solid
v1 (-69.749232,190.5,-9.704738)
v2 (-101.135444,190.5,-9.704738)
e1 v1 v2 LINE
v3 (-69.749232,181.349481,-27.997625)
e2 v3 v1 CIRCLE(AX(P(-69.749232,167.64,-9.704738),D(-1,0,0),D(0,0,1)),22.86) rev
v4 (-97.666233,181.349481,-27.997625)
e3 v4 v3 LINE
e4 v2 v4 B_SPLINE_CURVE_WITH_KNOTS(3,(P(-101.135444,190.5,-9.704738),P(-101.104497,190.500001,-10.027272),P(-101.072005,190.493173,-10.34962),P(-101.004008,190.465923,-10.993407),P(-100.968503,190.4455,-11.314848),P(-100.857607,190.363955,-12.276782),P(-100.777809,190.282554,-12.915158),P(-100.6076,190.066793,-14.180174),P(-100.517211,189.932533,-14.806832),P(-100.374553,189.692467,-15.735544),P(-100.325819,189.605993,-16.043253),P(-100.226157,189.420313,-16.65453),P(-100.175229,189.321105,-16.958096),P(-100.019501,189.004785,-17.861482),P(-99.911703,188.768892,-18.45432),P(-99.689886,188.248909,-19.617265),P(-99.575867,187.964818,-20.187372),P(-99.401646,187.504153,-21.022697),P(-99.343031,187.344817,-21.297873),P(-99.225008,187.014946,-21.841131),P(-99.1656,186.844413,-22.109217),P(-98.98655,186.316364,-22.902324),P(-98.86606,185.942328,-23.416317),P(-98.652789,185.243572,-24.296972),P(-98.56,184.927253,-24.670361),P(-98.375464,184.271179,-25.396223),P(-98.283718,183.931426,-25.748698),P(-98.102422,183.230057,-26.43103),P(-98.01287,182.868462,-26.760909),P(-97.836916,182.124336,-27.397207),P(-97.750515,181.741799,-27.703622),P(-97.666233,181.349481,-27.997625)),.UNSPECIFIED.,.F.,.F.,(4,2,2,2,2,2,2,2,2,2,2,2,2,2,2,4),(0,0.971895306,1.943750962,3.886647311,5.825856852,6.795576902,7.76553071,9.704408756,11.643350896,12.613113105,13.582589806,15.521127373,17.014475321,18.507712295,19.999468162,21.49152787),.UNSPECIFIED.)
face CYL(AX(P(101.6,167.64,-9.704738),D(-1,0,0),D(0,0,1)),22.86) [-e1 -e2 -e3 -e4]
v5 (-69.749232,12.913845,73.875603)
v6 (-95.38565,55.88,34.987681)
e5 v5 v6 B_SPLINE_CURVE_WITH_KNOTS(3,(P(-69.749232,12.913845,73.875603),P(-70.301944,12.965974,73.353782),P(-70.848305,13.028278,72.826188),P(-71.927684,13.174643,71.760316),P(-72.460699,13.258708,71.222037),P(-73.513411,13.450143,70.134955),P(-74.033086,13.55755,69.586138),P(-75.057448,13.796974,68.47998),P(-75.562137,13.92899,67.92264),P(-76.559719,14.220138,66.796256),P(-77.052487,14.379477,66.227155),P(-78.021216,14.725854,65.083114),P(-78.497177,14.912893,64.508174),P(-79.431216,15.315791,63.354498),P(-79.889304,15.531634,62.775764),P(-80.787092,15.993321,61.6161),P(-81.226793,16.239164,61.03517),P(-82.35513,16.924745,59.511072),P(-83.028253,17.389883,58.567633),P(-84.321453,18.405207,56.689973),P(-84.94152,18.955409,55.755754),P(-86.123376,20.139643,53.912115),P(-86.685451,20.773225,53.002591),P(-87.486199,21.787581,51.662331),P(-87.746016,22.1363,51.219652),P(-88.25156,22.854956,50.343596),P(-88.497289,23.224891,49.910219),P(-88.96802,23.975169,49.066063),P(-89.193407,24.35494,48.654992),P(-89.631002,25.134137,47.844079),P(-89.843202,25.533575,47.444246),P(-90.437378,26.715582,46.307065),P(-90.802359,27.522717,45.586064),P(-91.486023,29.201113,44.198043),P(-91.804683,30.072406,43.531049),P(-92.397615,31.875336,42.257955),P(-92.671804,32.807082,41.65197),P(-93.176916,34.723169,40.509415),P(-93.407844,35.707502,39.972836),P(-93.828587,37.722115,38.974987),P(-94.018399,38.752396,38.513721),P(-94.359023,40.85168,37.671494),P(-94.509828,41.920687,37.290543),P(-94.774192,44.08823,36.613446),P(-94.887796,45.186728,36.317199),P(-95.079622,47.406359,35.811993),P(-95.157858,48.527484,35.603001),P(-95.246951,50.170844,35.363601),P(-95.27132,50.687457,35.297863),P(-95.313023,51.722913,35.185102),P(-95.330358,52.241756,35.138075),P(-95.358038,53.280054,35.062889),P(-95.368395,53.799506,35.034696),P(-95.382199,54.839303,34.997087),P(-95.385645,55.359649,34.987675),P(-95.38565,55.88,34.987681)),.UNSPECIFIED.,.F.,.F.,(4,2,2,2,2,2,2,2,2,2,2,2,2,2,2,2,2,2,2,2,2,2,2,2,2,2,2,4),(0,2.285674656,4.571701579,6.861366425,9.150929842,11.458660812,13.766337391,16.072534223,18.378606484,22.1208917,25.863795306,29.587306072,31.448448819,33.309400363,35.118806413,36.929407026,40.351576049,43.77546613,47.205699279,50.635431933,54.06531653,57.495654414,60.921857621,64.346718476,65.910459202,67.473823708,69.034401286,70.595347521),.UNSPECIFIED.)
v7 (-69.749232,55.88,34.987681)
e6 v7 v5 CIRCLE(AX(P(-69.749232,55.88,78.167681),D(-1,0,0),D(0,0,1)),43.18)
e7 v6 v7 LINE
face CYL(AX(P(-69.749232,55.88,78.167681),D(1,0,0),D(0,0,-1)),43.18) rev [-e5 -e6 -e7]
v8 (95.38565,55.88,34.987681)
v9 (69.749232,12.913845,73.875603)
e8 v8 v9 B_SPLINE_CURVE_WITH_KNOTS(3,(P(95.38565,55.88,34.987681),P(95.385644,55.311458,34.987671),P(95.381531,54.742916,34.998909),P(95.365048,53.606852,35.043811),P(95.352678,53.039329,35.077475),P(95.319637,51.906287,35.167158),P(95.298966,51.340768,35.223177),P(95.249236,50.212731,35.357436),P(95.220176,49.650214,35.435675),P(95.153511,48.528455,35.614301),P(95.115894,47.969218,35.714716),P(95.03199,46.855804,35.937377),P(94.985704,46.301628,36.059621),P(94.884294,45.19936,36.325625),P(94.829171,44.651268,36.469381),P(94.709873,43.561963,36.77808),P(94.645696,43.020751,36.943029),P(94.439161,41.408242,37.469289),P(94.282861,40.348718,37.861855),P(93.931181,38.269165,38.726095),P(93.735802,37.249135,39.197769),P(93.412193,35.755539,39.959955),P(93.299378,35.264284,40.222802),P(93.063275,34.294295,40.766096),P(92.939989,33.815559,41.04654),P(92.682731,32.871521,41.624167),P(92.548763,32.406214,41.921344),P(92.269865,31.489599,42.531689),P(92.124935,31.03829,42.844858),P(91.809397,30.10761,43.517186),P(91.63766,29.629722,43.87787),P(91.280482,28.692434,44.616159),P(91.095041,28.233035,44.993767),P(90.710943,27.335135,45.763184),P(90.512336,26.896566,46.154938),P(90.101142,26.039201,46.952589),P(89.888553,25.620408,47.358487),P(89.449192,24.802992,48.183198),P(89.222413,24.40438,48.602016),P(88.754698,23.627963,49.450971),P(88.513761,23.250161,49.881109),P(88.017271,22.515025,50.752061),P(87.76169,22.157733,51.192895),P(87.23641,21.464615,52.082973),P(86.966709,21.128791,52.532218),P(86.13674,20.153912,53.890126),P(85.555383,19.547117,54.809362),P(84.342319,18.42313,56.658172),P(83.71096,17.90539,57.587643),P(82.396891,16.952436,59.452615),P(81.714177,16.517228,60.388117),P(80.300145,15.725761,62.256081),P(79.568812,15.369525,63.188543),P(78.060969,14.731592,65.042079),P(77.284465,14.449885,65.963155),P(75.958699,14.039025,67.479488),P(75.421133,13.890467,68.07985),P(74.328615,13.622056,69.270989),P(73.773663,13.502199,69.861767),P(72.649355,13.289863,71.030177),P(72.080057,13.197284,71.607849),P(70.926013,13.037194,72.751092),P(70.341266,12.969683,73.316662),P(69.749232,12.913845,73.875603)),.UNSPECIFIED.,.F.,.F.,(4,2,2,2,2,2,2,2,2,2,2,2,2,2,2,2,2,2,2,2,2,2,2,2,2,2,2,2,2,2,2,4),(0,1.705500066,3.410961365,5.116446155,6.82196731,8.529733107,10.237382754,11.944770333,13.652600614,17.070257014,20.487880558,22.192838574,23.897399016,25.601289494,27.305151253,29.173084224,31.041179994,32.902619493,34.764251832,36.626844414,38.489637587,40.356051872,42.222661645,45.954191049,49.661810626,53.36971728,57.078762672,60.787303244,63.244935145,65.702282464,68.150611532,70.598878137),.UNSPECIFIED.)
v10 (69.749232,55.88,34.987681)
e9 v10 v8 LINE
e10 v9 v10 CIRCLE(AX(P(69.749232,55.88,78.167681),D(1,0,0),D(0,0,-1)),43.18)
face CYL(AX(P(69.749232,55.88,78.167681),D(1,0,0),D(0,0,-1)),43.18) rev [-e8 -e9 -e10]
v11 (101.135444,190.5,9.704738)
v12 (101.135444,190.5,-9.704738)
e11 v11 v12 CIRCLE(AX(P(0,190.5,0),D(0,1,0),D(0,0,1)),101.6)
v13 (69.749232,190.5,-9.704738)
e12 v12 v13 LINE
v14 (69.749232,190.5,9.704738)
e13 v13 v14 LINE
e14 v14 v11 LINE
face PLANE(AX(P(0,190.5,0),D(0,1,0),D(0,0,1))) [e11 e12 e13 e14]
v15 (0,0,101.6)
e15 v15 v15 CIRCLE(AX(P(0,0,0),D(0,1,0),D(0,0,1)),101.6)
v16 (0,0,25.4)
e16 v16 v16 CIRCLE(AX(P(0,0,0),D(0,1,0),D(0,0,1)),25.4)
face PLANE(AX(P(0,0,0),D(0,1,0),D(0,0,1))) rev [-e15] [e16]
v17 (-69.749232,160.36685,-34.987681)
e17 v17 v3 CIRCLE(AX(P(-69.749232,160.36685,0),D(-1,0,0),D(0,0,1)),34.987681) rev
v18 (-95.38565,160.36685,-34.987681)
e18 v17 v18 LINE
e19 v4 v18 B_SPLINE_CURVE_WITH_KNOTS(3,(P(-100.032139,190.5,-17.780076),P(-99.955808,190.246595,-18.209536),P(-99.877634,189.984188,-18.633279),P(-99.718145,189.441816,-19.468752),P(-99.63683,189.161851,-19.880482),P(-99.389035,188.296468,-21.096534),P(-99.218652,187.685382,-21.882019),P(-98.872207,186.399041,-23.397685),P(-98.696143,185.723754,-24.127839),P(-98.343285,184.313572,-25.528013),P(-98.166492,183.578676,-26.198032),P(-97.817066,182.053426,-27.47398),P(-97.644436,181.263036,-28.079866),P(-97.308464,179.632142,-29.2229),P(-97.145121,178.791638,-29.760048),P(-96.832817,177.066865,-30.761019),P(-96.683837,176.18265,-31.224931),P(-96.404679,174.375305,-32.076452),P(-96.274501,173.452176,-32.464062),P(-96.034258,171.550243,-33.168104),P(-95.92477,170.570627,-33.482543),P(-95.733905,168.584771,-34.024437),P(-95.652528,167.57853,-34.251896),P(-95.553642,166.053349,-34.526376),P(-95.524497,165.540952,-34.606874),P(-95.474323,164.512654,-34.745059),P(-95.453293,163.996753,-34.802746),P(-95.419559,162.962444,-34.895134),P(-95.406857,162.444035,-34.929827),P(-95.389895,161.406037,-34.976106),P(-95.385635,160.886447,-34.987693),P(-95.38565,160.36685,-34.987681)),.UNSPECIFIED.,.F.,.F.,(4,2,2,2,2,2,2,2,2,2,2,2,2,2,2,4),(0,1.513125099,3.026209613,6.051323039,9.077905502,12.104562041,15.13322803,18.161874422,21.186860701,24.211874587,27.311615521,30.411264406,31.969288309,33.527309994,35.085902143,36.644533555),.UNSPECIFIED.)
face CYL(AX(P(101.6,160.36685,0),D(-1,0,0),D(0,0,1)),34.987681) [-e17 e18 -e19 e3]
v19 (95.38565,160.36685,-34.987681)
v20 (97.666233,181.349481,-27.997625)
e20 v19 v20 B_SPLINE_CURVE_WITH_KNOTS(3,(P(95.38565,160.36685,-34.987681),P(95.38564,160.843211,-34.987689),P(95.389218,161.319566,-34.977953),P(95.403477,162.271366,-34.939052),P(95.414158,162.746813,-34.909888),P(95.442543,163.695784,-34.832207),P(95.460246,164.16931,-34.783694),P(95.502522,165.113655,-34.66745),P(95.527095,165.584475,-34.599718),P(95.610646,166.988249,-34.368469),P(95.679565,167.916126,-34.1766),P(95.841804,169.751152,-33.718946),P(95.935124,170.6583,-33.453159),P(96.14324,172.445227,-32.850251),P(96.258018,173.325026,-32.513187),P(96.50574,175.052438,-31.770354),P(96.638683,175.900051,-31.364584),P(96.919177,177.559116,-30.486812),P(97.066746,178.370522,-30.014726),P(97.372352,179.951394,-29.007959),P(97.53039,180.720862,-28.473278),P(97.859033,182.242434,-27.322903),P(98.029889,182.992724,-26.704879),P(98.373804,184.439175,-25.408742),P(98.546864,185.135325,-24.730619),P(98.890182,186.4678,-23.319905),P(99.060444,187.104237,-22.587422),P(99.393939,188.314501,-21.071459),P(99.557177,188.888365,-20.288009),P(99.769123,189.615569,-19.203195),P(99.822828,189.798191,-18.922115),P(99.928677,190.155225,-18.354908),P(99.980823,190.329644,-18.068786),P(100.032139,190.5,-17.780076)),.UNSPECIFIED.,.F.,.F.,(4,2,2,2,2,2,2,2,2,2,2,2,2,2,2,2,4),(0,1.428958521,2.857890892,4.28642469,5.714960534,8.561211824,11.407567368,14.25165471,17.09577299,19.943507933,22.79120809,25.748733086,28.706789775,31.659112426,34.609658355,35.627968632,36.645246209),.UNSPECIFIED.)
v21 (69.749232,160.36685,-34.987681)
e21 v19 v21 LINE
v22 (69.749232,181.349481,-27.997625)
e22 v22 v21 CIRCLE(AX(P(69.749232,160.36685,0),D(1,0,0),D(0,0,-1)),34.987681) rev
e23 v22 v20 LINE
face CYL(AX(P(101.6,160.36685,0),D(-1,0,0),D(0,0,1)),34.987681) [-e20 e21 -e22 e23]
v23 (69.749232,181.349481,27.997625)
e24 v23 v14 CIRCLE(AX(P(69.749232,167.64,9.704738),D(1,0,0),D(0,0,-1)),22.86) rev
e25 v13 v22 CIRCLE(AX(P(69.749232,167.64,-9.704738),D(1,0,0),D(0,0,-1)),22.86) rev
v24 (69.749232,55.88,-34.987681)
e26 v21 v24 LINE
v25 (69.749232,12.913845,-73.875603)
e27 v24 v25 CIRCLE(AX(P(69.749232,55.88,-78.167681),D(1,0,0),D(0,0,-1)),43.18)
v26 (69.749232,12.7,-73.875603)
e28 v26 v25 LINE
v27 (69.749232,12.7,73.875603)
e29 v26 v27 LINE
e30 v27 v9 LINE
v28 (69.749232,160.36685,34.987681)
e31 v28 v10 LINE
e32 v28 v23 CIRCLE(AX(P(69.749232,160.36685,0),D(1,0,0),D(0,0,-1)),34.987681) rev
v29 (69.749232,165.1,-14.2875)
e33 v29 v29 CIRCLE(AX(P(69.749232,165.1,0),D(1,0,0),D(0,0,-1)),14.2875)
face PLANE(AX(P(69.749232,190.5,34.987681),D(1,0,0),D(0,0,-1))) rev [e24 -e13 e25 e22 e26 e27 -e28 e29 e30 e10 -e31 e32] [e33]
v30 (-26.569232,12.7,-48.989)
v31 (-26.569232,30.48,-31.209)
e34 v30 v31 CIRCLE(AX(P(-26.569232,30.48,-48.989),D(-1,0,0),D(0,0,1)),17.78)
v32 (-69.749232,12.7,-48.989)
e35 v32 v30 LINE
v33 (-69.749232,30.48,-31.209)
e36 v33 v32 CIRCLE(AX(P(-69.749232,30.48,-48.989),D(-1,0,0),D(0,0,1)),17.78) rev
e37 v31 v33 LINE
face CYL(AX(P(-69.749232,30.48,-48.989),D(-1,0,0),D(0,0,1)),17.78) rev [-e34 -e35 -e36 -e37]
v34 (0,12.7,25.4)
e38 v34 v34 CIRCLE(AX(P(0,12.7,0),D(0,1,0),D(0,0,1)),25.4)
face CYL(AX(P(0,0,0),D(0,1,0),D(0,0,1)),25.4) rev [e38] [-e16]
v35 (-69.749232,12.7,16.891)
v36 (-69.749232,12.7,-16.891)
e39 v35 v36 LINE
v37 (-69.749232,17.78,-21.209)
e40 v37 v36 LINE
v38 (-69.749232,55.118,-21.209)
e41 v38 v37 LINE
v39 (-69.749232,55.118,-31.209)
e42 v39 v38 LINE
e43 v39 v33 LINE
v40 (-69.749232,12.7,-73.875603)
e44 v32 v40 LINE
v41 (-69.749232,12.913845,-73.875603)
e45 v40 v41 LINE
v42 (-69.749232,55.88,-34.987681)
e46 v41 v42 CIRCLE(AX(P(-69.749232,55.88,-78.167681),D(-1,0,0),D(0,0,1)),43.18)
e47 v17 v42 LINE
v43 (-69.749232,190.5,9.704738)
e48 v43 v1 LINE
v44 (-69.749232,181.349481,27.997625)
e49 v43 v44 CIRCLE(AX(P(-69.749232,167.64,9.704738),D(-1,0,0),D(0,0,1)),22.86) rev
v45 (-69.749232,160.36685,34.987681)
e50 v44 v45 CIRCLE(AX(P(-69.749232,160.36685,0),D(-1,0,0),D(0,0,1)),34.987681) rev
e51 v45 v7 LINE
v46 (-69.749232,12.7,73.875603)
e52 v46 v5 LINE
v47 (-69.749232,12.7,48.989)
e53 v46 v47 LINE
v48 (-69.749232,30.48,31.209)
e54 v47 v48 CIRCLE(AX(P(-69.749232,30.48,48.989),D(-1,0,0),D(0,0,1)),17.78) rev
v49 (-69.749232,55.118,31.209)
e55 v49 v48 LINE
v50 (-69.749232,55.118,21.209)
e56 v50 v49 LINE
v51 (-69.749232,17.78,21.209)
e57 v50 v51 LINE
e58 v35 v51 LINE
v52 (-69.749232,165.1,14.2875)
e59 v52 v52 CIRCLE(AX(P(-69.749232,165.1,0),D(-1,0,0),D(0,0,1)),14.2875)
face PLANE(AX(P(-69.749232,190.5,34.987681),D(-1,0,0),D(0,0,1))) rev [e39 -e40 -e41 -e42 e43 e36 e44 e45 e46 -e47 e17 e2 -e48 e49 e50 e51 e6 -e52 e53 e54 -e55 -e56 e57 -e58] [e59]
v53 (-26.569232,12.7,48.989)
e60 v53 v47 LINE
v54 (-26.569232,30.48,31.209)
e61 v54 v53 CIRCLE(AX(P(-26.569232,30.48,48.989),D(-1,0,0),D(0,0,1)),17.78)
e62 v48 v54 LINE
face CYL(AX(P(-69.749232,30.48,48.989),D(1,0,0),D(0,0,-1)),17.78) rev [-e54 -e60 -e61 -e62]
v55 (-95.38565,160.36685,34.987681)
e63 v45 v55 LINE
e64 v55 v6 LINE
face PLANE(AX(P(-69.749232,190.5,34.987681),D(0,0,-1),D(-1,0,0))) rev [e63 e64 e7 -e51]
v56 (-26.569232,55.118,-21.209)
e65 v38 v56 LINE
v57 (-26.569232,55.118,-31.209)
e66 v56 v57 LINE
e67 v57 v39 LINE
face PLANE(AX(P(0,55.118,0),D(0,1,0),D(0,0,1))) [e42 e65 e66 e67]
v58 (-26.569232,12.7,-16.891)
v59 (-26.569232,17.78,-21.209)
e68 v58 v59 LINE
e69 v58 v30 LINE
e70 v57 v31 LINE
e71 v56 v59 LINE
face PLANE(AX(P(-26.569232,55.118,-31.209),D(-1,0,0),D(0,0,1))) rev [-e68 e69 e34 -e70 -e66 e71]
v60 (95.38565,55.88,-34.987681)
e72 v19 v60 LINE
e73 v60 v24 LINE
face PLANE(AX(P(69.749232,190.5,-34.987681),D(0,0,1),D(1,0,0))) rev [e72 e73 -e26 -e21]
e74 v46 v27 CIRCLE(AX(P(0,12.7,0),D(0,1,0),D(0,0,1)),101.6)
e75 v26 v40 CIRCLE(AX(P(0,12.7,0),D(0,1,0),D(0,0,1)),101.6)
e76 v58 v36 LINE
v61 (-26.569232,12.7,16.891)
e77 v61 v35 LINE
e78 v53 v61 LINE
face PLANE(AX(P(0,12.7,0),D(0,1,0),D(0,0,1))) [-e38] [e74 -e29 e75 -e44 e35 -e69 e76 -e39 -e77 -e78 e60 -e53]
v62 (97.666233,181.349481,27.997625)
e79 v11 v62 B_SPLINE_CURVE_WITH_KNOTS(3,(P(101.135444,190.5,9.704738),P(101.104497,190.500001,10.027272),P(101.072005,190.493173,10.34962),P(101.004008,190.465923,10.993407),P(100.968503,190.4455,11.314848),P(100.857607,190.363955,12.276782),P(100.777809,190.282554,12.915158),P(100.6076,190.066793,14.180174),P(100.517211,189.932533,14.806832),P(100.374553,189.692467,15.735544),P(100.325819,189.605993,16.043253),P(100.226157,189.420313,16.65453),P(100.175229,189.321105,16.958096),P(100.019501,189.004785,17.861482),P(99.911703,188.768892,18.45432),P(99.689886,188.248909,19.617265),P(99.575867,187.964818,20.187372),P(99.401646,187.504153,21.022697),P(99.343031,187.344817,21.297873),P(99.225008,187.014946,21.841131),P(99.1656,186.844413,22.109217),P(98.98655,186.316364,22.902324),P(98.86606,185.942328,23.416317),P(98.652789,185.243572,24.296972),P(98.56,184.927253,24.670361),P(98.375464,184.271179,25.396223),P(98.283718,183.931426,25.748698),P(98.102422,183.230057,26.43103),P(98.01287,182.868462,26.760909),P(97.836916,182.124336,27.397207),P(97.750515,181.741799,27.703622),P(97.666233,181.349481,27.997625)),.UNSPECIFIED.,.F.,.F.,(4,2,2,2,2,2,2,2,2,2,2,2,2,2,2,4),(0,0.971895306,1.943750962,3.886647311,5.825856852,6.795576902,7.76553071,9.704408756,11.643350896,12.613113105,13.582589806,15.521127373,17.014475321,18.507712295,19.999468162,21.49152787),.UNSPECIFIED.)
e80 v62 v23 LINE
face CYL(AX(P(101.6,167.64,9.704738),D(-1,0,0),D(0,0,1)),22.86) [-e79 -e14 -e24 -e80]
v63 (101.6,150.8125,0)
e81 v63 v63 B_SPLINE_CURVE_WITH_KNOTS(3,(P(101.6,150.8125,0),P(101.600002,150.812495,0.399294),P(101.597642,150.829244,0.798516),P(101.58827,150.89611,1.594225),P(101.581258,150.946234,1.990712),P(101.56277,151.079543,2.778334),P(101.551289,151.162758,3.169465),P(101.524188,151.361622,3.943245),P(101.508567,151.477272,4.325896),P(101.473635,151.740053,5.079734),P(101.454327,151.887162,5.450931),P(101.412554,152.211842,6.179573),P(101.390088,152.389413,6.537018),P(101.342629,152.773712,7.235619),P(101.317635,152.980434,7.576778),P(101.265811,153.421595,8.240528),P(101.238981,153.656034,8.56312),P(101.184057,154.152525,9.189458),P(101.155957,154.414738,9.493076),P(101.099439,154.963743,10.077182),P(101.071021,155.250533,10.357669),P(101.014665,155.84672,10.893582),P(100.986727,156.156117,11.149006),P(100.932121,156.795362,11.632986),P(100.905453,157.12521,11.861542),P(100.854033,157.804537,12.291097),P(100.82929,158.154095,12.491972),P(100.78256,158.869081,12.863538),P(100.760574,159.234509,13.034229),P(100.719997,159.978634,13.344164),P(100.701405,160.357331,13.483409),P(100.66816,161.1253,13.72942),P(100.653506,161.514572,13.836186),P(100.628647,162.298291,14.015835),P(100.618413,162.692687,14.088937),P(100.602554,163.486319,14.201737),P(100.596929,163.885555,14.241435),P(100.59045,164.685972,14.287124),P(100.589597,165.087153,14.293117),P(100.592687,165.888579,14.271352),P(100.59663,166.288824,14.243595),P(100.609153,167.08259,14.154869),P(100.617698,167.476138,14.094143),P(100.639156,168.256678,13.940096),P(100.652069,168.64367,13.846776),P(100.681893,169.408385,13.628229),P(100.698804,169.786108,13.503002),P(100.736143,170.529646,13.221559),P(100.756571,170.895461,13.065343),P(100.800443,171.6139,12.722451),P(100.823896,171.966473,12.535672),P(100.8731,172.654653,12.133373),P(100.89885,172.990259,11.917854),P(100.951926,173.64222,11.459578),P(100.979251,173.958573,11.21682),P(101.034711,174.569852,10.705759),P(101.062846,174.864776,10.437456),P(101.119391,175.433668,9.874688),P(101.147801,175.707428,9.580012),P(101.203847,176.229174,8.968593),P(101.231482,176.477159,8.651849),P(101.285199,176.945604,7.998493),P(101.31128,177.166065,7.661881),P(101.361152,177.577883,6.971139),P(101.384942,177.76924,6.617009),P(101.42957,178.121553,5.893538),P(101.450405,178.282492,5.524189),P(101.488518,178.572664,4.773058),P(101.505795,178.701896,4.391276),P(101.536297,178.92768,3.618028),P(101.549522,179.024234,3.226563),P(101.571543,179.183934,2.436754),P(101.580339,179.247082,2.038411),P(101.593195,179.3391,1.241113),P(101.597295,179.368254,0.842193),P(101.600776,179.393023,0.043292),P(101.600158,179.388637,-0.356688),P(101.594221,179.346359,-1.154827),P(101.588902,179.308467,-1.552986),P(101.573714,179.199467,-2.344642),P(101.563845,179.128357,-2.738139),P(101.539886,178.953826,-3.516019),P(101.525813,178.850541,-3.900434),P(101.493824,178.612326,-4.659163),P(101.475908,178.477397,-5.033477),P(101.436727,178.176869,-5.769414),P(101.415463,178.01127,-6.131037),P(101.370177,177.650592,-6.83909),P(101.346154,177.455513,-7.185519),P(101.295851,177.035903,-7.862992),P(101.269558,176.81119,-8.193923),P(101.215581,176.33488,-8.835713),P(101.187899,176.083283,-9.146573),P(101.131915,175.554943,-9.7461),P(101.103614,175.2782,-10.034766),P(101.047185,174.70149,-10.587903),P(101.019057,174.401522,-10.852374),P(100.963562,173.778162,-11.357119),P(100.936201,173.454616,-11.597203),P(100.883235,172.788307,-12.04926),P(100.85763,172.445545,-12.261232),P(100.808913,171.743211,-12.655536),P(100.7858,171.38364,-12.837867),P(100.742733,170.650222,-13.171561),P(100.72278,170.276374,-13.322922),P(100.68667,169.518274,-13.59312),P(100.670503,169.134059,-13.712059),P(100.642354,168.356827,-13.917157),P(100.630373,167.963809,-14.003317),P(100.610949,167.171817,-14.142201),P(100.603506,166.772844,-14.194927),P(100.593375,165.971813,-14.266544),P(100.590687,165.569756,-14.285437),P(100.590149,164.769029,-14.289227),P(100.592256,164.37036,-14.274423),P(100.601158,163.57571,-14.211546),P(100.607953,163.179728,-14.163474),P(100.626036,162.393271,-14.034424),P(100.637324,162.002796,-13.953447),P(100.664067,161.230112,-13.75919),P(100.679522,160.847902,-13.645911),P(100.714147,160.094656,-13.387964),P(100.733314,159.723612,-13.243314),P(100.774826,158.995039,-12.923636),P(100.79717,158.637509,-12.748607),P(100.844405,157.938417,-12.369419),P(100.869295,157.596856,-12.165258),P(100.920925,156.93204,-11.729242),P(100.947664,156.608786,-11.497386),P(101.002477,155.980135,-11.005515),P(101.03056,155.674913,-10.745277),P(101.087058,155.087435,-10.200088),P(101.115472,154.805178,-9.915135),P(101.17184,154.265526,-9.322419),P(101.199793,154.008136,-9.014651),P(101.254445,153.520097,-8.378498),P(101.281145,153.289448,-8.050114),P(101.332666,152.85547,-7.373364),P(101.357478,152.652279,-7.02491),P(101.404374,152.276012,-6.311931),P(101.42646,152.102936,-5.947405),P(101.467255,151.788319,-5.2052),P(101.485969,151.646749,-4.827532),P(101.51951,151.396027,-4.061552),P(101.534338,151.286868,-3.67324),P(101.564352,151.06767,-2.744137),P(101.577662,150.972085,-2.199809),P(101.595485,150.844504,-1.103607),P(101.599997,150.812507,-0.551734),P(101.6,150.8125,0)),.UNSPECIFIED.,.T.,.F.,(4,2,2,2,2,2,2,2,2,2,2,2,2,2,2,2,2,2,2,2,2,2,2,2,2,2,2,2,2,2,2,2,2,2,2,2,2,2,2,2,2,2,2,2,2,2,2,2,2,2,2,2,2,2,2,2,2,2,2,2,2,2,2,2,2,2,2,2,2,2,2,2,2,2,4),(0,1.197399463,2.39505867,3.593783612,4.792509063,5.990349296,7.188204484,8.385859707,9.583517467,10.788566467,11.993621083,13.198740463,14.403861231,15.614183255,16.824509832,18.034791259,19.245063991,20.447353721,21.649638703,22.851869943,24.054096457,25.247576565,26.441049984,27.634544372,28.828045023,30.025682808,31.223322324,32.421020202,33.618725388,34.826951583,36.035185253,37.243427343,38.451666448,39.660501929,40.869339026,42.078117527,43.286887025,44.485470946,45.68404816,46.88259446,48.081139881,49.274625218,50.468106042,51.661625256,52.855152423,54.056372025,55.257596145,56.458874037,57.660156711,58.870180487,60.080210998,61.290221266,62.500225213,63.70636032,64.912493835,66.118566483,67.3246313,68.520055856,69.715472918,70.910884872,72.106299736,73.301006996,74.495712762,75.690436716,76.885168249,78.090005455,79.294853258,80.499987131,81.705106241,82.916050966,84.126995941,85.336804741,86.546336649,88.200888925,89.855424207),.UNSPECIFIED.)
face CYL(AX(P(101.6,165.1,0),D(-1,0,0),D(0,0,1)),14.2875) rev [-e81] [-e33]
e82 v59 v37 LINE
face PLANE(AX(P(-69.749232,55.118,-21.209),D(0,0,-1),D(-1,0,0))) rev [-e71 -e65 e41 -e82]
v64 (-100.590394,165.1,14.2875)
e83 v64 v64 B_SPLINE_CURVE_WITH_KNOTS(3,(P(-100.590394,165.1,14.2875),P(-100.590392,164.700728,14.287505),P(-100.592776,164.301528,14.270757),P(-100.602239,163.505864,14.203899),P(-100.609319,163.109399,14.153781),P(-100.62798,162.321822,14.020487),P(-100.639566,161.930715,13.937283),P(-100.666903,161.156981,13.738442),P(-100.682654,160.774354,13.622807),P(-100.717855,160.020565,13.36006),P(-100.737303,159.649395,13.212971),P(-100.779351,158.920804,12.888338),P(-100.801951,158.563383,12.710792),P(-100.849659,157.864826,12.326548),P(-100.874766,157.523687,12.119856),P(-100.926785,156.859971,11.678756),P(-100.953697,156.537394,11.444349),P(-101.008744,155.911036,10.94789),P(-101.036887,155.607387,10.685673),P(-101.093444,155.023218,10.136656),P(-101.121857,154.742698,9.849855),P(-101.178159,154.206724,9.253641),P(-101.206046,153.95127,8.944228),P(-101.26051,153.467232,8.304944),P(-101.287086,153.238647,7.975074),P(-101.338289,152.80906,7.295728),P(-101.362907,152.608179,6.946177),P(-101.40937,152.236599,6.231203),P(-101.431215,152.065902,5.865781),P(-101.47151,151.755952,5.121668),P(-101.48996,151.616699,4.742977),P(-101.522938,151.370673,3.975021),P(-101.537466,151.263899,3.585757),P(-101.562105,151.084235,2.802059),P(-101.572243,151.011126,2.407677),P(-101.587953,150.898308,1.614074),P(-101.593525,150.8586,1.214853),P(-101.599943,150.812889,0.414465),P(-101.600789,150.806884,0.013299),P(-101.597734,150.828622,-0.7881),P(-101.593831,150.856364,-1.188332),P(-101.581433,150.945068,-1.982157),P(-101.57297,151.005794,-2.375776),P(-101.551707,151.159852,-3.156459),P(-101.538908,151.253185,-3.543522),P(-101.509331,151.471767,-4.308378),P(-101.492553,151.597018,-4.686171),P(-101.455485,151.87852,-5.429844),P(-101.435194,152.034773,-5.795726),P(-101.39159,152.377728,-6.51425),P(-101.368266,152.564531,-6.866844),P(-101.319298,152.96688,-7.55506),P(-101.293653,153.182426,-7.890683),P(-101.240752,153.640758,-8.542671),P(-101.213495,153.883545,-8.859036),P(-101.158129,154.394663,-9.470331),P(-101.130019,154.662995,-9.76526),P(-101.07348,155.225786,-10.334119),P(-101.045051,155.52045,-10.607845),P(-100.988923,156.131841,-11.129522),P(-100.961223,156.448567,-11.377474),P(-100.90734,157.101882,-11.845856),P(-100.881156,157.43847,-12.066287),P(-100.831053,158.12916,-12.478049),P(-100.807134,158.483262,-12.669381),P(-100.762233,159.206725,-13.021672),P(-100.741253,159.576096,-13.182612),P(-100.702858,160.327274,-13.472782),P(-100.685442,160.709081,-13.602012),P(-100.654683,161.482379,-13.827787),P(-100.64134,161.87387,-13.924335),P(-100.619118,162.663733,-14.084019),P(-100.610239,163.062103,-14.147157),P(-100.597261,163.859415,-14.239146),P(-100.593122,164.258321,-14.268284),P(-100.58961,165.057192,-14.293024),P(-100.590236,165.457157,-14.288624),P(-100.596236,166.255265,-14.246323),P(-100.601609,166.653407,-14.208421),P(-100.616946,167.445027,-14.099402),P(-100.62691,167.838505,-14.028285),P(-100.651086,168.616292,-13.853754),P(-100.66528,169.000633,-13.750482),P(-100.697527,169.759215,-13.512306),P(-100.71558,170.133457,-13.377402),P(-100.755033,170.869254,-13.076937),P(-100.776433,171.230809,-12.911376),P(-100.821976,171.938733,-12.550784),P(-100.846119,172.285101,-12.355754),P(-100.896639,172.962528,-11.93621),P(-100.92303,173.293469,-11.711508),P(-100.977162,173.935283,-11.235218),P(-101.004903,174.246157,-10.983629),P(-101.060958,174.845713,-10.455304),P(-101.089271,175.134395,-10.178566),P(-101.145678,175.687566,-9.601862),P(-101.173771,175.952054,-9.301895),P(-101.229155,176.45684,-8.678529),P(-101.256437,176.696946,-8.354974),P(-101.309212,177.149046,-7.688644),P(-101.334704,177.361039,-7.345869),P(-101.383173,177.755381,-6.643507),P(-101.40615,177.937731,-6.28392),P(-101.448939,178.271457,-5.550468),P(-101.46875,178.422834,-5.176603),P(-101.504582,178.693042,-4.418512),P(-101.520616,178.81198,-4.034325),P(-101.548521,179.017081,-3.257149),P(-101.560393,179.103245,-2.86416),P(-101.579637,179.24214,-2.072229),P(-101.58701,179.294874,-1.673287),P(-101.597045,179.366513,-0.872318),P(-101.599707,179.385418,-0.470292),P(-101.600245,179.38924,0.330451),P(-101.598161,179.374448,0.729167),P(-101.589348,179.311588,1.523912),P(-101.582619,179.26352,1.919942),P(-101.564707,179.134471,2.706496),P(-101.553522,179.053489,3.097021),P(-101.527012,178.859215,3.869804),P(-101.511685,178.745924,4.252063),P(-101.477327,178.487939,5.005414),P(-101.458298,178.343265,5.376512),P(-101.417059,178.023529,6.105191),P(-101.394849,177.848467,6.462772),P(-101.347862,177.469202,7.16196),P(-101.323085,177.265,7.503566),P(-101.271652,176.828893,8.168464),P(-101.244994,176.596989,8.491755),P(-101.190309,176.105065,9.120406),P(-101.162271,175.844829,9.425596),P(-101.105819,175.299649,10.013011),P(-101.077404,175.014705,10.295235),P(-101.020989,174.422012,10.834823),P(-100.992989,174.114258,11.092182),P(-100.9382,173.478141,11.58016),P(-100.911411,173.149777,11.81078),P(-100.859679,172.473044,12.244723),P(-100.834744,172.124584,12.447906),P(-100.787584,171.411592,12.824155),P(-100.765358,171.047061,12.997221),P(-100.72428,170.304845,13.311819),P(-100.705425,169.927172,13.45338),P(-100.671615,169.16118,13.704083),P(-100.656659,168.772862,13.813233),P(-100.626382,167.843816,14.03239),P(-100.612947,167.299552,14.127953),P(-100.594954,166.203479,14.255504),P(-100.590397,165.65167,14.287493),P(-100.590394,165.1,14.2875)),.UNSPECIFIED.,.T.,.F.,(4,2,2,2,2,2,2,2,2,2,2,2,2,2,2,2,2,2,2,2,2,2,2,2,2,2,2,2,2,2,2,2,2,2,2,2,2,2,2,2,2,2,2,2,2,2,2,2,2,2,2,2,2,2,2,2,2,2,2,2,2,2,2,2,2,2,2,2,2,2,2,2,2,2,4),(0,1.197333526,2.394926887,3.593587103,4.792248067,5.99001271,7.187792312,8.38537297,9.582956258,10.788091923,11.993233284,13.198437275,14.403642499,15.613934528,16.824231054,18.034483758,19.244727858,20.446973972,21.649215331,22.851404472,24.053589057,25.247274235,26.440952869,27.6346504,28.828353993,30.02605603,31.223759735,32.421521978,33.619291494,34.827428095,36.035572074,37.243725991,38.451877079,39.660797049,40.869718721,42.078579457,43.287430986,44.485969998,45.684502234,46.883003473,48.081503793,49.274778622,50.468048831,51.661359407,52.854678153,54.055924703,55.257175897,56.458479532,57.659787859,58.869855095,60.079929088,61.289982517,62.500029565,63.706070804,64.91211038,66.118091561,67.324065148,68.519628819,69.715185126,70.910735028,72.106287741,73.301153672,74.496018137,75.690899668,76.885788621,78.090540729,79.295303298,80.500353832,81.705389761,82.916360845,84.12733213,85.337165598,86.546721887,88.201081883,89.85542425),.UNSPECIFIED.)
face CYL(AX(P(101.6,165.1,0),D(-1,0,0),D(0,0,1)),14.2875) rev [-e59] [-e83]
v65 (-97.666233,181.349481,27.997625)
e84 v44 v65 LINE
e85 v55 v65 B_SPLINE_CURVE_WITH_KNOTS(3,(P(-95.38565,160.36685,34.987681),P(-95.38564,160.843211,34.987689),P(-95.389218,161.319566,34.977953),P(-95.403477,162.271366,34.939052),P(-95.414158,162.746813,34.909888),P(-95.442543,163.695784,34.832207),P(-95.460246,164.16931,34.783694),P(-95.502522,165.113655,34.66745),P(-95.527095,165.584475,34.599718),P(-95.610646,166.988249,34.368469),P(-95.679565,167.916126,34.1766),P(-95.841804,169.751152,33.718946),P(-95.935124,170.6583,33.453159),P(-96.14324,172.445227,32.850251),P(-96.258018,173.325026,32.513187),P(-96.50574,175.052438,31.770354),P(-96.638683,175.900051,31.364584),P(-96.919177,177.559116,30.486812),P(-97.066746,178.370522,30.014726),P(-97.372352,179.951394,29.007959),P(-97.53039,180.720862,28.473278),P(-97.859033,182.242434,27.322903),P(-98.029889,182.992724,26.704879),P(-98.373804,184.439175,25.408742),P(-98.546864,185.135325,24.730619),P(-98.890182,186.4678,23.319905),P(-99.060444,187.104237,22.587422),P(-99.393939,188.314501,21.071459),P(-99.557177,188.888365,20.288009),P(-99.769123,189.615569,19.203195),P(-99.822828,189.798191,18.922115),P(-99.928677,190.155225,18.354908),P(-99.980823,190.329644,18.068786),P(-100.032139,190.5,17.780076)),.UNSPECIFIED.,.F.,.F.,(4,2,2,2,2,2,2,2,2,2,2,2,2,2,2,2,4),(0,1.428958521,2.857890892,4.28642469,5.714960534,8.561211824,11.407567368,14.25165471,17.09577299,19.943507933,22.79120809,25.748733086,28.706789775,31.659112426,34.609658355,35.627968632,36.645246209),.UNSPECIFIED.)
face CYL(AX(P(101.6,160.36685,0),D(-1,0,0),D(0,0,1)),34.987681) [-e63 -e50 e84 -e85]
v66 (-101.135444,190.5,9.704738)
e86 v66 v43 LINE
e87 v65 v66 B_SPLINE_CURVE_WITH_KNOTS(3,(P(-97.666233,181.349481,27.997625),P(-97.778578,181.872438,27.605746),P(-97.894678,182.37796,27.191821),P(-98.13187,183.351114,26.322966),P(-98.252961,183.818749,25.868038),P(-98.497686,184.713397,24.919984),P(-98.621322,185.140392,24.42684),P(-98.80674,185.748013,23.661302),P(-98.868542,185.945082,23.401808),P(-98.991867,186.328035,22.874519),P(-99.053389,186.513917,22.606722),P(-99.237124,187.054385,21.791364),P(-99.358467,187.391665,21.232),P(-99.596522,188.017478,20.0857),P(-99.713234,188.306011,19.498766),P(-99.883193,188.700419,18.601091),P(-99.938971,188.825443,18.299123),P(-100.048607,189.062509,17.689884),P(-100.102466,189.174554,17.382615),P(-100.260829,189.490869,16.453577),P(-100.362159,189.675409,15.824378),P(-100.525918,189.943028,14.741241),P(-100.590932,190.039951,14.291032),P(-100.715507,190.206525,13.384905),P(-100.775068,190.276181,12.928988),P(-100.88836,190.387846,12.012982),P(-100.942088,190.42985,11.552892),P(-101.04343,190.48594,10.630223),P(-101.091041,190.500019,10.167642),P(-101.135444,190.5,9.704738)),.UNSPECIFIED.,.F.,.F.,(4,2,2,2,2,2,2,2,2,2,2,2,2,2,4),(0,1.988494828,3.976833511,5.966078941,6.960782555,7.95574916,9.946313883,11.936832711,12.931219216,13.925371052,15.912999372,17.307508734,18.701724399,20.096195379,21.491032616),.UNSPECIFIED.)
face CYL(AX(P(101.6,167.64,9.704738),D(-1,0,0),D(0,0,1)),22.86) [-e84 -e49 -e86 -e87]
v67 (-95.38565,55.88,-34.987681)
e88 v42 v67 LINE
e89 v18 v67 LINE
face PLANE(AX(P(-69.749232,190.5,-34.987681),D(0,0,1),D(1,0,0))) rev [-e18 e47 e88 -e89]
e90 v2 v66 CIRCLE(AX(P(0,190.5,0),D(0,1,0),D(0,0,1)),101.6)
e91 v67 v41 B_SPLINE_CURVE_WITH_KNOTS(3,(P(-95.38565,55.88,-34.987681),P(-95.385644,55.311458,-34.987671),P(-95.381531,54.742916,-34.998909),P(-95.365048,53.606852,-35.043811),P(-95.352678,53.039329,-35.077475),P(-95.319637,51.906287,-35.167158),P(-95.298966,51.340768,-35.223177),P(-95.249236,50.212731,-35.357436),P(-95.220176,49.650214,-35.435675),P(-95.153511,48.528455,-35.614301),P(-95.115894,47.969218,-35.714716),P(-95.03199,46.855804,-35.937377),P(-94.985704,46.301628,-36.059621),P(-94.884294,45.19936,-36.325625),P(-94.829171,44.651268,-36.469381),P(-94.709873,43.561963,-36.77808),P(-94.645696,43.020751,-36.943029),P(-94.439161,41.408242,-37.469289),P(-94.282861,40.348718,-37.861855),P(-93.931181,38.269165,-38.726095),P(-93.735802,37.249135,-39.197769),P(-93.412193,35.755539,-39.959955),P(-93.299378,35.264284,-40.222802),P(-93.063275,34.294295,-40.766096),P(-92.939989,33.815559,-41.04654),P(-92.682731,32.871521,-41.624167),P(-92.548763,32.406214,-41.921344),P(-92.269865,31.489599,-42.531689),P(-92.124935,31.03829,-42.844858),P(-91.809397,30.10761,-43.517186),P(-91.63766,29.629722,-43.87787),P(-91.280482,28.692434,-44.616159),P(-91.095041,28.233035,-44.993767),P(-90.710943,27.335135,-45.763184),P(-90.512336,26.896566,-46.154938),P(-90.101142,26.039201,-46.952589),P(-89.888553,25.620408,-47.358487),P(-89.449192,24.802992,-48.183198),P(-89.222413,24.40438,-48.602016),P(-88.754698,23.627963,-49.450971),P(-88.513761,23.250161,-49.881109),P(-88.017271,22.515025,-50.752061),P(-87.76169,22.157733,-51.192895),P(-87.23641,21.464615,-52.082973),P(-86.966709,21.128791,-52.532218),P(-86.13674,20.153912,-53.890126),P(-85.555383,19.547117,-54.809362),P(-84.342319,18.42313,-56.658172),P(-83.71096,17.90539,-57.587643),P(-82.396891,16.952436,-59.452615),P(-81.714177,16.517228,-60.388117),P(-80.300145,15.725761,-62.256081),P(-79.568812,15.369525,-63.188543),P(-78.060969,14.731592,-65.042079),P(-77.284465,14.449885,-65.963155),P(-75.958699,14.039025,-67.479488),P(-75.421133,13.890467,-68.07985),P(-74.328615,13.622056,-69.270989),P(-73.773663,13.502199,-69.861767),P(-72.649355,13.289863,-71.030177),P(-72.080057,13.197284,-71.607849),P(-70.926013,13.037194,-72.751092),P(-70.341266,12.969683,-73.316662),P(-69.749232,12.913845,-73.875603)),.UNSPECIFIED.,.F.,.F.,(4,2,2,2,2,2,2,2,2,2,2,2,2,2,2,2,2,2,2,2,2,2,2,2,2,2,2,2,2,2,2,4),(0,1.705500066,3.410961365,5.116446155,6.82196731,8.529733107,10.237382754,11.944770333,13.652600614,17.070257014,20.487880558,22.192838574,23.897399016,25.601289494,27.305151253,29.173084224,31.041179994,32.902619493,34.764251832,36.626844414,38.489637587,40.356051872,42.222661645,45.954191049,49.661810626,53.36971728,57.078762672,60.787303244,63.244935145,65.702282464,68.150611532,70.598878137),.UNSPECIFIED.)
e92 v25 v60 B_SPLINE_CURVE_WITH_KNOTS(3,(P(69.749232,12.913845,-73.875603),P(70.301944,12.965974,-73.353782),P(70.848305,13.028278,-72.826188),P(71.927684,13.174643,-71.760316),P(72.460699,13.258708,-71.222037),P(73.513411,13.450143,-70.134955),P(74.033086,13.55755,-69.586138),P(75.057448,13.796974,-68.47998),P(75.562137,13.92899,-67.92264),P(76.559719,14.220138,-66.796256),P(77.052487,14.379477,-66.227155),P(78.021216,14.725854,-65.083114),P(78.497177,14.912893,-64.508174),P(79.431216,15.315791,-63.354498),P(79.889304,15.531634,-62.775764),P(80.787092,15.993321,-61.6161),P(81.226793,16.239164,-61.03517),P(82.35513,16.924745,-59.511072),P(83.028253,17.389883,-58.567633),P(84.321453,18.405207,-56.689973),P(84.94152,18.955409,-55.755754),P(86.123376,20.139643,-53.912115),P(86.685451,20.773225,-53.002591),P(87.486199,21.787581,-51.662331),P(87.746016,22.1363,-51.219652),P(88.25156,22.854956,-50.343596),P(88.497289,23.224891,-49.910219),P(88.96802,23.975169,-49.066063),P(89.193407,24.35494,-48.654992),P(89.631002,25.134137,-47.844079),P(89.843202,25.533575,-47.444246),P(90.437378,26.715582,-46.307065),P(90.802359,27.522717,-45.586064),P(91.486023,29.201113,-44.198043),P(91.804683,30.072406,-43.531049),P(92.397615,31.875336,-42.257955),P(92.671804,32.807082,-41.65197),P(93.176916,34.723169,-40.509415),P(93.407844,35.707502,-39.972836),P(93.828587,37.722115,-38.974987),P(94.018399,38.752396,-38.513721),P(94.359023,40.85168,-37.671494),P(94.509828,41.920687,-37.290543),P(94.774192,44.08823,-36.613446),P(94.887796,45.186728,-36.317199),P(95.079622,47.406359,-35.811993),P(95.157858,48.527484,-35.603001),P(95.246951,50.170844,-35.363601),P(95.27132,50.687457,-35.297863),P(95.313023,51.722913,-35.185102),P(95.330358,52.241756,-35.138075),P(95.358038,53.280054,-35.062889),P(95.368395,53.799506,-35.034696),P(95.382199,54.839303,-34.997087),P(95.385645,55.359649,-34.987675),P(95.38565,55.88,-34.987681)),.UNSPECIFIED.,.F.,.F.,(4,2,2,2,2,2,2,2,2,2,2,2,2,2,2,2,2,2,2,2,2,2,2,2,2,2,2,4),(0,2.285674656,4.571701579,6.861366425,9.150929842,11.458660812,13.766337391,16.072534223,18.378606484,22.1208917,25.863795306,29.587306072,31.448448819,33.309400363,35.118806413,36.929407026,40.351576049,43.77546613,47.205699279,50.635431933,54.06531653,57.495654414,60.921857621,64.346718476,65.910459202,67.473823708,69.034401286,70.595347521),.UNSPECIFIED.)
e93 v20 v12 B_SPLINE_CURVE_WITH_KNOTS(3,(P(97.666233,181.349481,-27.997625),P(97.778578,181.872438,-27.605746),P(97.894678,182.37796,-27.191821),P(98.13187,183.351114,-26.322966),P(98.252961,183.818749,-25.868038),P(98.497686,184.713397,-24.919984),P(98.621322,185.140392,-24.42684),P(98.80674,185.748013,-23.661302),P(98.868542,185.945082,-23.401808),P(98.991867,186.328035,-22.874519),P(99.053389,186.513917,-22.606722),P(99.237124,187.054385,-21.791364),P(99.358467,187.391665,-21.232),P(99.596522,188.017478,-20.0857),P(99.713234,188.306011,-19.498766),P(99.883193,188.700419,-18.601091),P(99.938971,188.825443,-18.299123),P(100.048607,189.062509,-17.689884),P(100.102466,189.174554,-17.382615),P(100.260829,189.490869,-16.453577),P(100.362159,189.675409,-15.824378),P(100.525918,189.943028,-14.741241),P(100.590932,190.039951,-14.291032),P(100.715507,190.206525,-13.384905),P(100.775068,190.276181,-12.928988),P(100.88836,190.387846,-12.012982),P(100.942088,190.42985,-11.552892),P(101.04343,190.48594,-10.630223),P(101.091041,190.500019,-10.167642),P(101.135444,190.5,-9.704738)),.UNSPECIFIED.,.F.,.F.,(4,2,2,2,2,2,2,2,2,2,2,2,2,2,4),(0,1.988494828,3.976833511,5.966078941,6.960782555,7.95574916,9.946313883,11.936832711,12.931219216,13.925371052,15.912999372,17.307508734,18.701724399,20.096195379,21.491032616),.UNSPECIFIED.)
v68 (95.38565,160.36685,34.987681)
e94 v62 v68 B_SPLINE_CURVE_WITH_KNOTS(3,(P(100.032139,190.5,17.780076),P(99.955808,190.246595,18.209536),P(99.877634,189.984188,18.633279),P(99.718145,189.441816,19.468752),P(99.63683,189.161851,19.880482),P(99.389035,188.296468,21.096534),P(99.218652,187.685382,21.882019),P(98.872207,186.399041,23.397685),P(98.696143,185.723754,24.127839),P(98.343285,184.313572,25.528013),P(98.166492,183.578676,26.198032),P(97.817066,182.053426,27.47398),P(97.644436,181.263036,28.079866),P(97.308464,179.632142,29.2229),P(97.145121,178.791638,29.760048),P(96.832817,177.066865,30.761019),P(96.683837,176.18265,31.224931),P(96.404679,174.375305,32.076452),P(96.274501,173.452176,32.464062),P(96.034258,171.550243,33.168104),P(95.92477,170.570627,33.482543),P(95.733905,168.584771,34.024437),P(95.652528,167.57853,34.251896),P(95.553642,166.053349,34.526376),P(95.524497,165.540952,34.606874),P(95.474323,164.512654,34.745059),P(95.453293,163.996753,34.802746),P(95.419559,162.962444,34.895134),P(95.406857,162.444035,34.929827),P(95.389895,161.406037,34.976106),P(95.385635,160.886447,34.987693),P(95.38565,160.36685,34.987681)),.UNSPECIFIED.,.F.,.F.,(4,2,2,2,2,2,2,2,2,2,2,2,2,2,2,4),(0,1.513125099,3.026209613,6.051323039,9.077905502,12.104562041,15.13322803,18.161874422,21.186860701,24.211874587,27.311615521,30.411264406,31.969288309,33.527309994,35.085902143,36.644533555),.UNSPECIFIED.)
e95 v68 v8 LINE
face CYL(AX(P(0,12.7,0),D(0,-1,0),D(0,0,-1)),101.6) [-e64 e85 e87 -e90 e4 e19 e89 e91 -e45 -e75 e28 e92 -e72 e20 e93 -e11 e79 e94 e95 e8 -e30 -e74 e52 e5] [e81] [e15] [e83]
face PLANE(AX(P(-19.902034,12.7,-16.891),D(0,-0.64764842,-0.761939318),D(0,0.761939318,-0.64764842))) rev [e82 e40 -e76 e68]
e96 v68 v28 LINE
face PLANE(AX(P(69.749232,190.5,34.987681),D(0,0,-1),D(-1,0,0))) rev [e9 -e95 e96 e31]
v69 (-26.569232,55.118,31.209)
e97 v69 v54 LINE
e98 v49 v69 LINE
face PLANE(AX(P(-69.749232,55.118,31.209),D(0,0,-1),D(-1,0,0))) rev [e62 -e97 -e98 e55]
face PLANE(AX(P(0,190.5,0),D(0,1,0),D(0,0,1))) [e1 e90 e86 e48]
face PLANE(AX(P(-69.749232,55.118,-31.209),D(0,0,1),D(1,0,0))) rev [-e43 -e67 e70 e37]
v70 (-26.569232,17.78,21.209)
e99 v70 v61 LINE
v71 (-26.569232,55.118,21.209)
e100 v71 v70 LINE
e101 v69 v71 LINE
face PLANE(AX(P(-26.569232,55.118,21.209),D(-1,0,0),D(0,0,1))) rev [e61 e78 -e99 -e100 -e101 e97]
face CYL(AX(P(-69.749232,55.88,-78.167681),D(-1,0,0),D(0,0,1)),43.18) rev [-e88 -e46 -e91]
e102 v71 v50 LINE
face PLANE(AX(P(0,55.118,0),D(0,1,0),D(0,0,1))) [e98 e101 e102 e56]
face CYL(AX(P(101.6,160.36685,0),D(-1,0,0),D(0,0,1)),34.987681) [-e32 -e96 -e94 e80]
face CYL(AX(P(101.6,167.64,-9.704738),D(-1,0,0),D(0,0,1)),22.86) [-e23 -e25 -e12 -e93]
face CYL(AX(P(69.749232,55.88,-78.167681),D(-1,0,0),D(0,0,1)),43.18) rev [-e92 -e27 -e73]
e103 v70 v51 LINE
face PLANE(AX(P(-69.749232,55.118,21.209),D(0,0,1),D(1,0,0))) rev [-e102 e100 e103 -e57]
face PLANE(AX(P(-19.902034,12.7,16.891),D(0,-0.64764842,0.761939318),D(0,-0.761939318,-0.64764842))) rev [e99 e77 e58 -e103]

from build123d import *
from build123d.topology import SkipClean

# Parameters (mm, degrees)
SKETCH1_R               = 101.6
BOSS_EXTRUDE1_DEPTH     = 12.7
BOSS_EXTRUDE3_DEPTH     = 177.8
FILLET3_R               = 43.18
SKETCH3_R               = 25.4
CUT_EXTRUDE1_DEPTH      = 229.600000167
CUT_EXTRUDE2_DEPTH      = 276.632670899
CUT_EXTRUDE2_DEPTH_BACK = 276.632670899
SKETCH4_R               = 14.2875
CUT_EXTRUDE3_DEPTH      = 276.6326709
CUT_EXTRUDE3_DEPTH_BACK = 276.6326709
FILLET4_R               = 22.86
SKETCH7_W               = 43.18
SKETCH7_H               = 10
BOSS_EXTRUDE4_DEPTH     = 42.418
BOSS_EXTRUDE5_DEPTH     = 43.18
FILLET5_R               = 17.78


with BuildPart() as part:
    # Sketch1 → Boss-Extrude1 (new body)
    with BuildSketch(Plane(origin=(0, 0, 0), x_dir=(1, 0, 0), z_dir=(0, 1, 0))):
        with Locations(Location((0, 0, 0), (0, 0, 270))):
            Circle(SKETCH1_R)
    extrude(amount=BOSS_EXTRUDE1_DEPTH)

    # Sketch2 → Boss-Extrude3 (add)
    with SkipClean():  # the faces are left unmerged after this step: merging them gives an invalid solid
        with BuildSketch(Plane(origin=(0, 12.7, 0), x_dir=(1, 0, 0), z_dir=(0, 1, 0))):
            with BuildLine():
                Line((-69.749231612, -34.987681034), (-95.385649738, -34.987681034))
                ThreePointArc((-95.385649738, -34.987681034), (-101.6, 0), (-95.385649738, 34.987681034))
                Line((-95.385649738, 34.987681034), (-69.749231612, 34.987681034))
                Line((-69.749231612, 34.987681034), (-69.749231612, -34.987681034))
            make_face()
            with BuildLine():
                Line((69.749231612, 34.987681034), (95.385649738, 34.987681034))
                ThreePointArc((95.385649738, 34.987681034), (101.6, 0), (95.385649738, -34.987681034))
                Line((95.385649738, -34.987681034), (69.749231612, -34.987681034))
                Line((69.749231612, -34.987681034), (69.749231612, 34.987681034))
            make_face()
        extrude(amount=BOSS_EXTRUDE3_DEPTH)

    # Fillet3
    # the kernel refuses this fillet: 43.18 mm, written as the material it adds along each edge
    with BuildSketch(Plane(origin=(-203.335649738, 12.7, -34.987681034), x_dir=(0, 0, -1), z_dir=(1, 0, 0))) as fillet3_piece_1_section:
        with BuildLine():
            CenterArc((FILLET3_R, FILLET3_R), FILLET3_R, 180, 90)
            Line((0, FILLET3_R), (0, 0))
            Line((0, 0), (FILLET3_R, 0))
        make_face()
    fillet3_piece_1 = extrude(amount=133.586418126, mode=Mode.PRIVATE)
    fillet3_piece_1 = fillet3_piece_1 & Plane(origin=(0, 23.799745308, 0), x_dir=(0, 0, 1), z_dir=(0, -1, 0)) * Cylinder(101.6, 440, mode=Mode.PRIVATE)
    add(fillet3_piece_1)
    with BuildSketch(Plane(origin=(203.335649738, 12.7, 34.987681034), x_dir=(0, 0, 1), z_dir=(-1, 0, 0))) as fillet3_piece_2_section:
        with BuildLine():
            CenterArc((FILLET3_R, FILLET3_R), FILLET3_R, 180, 90)
            Line((0, FILLET3_R), (0, 0))
            Line((0, 0), (FILLET3_R, 0))
        make_face()
    fillet3_piece_2 = extrude(amount=133.586418126, mode=Mode.PRIVATE)
    fillet3_piece_2 = fillet3_piece_2 & Plane(origin=(0, 23.799745308, 0), x_dir=(0, 0, 1), z_dir=(0, -1, 0)) * Cylinder(101.6, 440, mode=Mode.PRIVATE)
    add(fillet3_piece_2)
    with BuildSketch(Plane(origin=(69.749231612, 12.7, -34.987681034), x_dir=(0, 0, -1), z_dir=(1, 0, 0))) as fillet3_piece_3_section:
        with BuildLine():
            CenterArc((FILLET3_R, FILLET3_R), FILLET3_R, 180, 90)
            Line((0, FILLET3_R), (0, 0))
            Line((0, 0), (FILLET3_R, 0))
        make_face()
    fillet3_piece_3 = extrude(amount=133.586418126, mode=Mode.PRIVATE)
    fillet3_piece_3 = fillet3_piece_3 & Plane(origin=(0, 23.79973444, 0), x_dir=(0, 0, 1), z_dir=(0, -1, 0)) * Cylinder(101.6, 440, mode=Mode.PRIVATE)
    add(fillet3_piece_3)
    with BuildSketch(Plane(origin=(-69.749231612, 12.7, 34.987681034), x_dir=(0, 0, 1), z_dir=(-1, 0, 0))) as fillet3_piece_4_section:
        with BuildLine():
            CenterArc((FILLET3_R, FILLET3_R), FILLET3_R, 180, 90)
            Line((0, FILLET3_R), (0, 0))
            Line((0, 0), (FILLET3_R, 0))
        make_face()
    fillet3_piece_4 = extrude(amount=133.586418126, mode=Mode.PRIVATE)
    fillet3_piece_4 = fillet3_piece_4 & Plane(origin=(0, 23.79973444, 0), x_dir=(0, 0, 1), z_dir=(0, -1, 0)) * Cylinder(101.6, 440, mode=Mode.PRIVATE)
    add(fillet3_piece_4)

    # Sketch3 → Cut-Extrude1 (cut, through all)
    with BuildSketch(Plane(origin=(0, 12.7, 0), x_dir=(1, 0, 0), z_dir=(0, 1, 0))):
        with Locations(Location((0, 0, 0), (0, 0, 270))):
            Circle(SKETCH3_R)
    extrude(amount=-CUT_EXTRUDE1_DEPTH, mode=Mode.SUBTRACT)

    # Sketch4 → Cut-Extrude2 (cut, two sides: drawn at the far end of the back side and taken through both)
    with BuildSketch(Plane.ZY.offset(-69.749231612).offset(-CUT_EXTRUDE2_DEPTH_BACK)):
        with Locations((0, 165.1)):
            Circle(SKETCH4_R)
    extrude(amount=CUT_EXTRUDE2_DEPTH + CUT_EXTRUDE2_DEPTH_BACK, mode=Mode.SUBTRACT)

    # Sketch5 → Cut-Extrude3 (cut, two sides: drawn at the far end of the back side and taken through both)
    with BuildSketch(Plane.ZY.offset(-69.749231612).offset(-CUT_EXTRUDE3_DEPTH_BACK)):
        with BuildLine():
            Line((34.987681034, 160.366849855), (34.987681034, 209.992755937))
            Line((34.987681034, 209.992755937), (-34.987681034, 209.992755937))
            Line((-34.987681034, 209.992755937), (-34.987681034, 160.366849855))
            ThreePointArc((-34.987681034, 160.366849855), (0, 195.354530889), (34.987681034, 160.366849855))
        make_face()
    extrude(amount=CUT_EXTRUDE3_DEPTH + CUT_EXTRUDE3_DEPTH_BACK, mode=Mode.SUBTRACT)

    # Fillet4
    fillet4_edges = [part.edges().sort_by_distance(p)[0] for p in [
        (-84.890685507, 190.5, -17.780075547),
        (-84.890685507, 190.5, 17.780075547),
        (84.890685507, 190.5, -17.780075547),
        (84.890685507, 190.5, 17.780075547),
    ]]
    fillet(fillet4_edges, radius=FILLET4_R)

    # Sketch7 → Boss-Extrude4 (add)
    with BuildSketch(Plane(origin=(0, 12.7, 0), x_dir=(1, 0, 0), z_dir=(0, 1, 0))):
        with Locations((-48.159231612, 26.209)):
            Rectangle(SKETCH7_W, SKETCH7_H)
        with Locations((-48.159231612, -26.209)):
            Rectangle(SKETCH7_W, SKETCH7_H)
    extrude(amount=BOSS_EXTRUDE4_DEPTH)

    # Sketch8 → Boss-Extrude5 (add)
    with BuildSketch(Plane(origin=(-69.749231612, 0, 0), x_dir=(0, 0, -1), z_dir=(1, 0, 0))):
        Polygon((-21.209, 17.78), (-21.209, 12.7), (-16.891, 12.7), align=None)
        Polygon((16.891, 12.7), (21.209, 17.78), (21.209, 12.7), align=None)
    extrude(amount=BOSS_EXTRUDE5_DEPTH)

    # Fillet5
    fillet5_edges = [part.edges().sort_by_distance(p)[0] for p in [
        (-48.159231612, 12.7, -31.209),
        (-48.159231612, 12.7, 31.209),
    ]]
    fillet(fillet5_edges, radius=FILLET5_R)


solid = part.part
